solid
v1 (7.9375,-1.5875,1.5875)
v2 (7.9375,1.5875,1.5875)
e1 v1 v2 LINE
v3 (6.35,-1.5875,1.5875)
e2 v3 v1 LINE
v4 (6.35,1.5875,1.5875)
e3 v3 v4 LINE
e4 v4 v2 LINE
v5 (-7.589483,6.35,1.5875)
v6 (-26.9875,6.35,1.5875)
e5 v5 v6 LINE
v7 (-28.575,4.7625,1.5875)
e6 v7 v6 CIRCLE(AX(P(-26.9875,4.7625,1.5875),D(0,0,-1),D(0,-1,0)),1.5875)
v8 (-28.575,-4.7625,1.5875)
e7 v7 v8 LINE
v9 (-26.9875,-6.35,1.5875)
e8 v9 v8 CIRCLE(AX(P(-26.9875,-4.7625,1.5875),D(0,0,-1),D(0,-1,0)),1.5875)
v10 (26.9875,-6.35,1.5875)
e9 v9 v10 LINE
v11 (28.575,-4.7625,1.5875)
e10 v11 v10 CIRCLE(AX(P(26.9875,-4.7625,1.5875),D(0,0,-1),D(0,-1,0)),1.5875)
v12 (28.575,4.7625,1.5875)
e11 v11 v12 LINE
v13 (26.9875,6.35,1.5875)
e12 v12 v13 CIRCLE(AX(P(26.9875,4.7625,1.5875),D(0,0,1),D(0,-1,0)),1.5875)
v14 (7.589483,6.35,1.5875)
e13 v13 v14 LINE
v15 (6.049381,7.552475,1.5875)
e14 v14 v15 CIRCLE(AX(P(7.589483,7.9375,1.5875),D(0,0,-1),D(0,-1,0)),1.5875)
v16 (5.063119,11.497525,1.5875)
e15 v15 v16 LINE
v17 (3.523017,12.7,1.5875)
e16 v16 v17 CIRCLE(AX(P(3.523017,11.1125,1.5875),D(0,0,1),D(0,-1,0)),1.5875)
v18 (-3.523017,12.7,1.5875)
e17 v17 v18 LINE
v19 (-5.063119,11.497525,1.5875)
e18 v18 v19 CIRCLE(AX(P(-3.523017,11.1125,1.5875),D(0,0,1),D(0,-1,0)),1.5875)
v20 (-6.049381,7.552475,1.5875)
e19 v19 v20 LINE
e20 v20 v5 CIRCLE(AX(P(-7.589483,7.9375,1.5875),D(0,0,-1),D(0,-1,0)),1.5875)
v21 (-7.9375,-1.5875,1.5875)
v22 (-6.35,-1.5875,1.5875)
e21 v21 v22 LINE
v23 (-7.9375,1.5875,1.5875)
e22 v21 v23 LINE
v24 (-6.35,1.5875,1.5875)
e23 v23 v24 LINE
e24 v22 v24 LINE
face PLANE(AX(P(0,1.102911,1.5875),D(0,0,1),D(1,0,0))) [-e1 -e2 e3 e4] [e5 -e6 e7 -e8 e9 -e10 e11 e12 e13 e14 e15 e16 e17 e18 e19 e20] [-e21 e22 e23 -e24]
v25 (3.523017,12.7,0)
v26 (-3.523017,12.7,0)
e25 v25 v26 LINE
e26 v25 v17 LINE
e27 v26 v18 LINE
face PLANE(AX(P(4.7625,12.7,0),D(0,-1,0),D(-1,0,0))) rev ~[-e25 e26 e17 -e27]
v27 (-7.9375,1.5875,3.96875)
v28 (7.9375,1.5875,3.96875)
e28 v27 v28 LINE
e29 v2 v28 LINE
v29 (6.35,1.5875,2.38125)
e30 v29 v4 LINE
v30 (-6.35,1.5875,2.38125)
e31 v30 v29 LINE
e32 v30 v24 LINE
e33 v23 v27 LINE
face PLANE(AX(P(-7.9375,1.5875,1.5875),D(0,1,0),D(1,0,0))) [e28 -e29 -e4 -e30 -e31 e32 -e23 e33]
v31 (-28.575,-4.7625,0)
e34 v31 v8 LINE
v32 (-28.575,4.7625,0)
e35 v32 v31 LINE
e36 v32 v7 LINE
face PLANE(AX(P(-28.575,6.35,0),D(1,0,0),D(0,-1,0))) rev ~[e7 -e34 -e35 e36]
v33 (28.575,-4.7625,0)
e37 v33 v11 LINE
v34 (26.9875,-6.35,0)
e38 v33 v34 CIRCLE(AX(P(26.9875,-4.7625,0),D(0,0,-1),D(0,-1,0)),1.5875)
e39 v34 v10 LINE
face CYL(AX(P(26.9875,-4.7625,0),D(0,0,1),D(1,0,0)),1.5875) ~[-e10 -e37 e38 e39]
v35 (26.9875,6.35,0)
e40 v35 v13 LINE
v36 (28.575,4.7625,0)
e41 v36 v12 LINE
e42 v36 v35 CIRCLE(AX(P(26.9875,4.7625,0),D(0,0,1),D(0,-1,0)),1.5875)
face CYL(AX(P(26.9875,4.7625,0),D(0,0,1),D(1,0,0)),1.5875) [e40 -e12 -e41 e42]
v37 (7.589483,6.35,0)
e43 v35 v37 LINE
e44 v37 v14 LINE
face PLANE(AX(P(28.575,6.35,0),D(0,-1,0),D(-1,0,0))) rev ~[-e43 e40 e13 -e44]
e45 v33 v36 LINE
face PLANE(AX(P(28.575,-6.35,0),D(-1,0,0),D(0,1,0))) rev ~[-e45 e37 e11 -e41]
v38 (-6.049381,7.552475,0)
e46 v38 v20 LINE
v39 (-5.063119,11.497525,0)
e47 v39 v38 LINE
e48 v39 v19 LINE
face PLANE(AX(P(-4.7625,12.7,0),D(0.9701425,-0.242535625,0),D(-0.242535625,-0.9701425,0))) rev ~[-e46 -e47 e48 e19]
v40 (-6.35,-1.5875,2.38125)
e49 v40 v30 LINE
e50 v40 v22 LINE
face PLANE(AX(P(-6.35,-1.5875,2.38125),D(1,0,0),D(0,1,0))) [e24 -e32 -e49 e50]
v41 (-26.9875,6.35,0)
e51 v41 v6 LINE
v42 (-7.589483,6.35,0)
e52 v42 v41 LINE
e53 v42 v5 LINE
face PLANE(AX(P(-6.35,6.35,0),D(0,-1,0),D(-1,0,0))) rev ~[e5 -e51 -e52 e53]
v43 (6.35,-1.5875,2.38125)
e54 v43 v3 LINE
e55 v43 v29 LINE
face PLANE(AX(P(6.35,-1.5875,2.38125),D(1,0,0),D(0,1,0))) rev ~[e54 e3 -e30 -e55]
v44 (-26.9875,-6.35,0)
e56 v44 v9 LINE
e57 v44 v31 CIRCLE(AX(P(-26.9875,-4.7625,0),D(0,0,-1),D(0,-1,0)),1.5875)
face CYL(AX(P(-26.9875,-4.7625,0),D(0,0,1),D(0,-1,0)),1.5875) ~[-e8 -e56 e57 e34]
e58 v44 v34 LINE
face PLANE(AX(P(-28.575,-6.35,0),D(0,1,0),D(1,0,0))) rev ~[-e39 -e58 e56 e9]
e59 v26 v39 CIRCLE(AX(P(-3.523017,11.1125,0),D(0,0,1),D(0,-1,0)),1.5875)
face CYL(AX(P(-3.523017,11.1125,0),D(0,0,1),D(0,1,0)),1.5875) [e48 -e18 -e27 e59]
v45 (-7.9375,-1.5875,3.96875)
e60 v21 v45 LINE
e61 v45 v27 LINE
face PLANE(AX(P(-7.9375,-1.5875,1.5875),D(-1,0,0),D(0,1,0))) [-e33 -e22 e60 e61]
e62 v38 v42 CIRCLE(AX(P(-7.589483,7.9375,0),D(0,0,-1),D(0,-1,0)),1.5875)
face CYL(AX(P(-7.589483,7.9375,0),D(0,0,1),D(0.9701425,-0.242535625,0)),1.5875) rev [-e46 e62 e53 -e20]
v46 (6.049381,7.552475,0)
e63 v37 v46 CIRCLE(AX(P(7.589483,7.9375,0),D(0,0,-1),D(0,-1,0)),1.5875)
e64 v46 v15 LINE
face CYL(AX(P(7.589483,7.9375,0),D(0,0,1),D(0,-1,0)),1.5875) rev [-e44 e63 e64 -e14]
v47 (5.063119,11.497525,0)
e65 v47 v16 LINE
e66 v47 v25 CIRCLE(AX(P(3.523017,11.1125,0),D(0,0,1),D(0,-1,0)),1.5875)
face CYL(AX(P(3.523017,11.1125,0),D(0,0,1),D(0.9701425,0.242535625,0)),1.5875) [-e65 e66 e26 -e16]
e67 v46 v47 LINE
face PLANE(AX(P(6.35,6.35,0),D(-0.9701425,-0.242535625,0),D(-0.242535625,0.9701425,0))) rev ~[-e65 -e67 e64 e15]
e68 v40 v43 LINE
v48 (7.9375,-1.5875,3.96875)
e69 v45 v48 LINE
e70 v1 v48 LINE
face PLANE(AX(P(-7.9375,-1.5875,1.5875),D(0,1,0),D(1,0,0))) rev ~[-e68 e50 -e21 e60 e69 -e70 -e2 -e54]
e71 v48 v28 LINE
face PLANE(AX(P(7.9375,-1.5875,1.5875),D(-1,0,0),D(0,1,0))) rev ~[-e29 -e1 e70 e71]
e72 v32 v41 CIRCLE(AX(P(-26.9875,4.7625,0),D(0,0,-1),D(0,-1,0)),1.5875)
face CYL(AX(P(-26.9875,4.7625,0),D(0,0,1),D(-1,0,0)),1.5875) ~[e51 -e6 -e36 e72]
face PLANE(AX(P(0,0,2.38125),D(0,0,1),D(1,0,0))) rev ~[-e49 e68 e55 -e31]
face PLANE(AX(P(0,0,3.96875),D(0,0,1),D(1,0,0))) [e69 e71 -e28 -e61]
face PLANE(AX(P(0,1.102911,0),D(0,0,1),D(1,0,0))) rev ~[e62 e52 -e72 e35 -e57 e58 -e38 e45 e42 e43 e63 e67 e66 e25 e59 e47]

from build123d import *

# Parameters (mm, degrees)
F1_DEPTH = 1.5875
F2_W     = 15.875
F2_H     = 3.175
F3_DEPTH = 2.38125
F5_W     = 12.7
F5_H     = 3.175
F6_DEPTH = 0.79375
F7_R     = 1.5875


# Not quite as in the source:
# - a feature of the source that left no trace in its solid (it failed there, or was rolled back) is left out


with BuildPart() as f1:
    # F0 (on Top) → F1 (new body)
    with BuildSketch(Plane.XY):
        Polygon((28.575, -6.35), (28.575, 6.35), (6.35, 6.35), (4.7625, 12.7), (-4.7625, 12.7), (-6.35, 6.35), (-28.575, 6.35), (-28.575, -6.35), align=None)
    extrude(amount=F1_DEPTH)

    # F2 (on face) → F3 (join)
    with BuildSketch(Plane.XY.offset(1.5875)):
        Rectangle(F2_W, F2_H)
    extrude(amount=F3_DEPTH)

    # F5 (on offset) → F6 (cut)
    with BuildSketch(Plane.XY.offset(2.38125)):
        Rectangle(F5_W, F5_H)
    extrude(amount=-F6_DEPTH, mode=Mode.SUBTRACT)

    # F7
    f7_edges = [f1.edges().sort_by_distance(p)[0] for p in [
        (-28.575, -6.35, 0.79375),
        (28.575, -6.35, 0.79375),
        (28.575, 6.35, 0.79375),
        (4.7625, 12.7, 0.79375),
        (-28.575, 6.35, 0.79375),
        (-4.7625, 12.7, 0.79375),
        (-6.35, 6.35, 0.79375),
        (6.35, 6.35, 0.79375),
    ]]
    fillet(f7_edges, radius=F7_R)


solid = f1.part
